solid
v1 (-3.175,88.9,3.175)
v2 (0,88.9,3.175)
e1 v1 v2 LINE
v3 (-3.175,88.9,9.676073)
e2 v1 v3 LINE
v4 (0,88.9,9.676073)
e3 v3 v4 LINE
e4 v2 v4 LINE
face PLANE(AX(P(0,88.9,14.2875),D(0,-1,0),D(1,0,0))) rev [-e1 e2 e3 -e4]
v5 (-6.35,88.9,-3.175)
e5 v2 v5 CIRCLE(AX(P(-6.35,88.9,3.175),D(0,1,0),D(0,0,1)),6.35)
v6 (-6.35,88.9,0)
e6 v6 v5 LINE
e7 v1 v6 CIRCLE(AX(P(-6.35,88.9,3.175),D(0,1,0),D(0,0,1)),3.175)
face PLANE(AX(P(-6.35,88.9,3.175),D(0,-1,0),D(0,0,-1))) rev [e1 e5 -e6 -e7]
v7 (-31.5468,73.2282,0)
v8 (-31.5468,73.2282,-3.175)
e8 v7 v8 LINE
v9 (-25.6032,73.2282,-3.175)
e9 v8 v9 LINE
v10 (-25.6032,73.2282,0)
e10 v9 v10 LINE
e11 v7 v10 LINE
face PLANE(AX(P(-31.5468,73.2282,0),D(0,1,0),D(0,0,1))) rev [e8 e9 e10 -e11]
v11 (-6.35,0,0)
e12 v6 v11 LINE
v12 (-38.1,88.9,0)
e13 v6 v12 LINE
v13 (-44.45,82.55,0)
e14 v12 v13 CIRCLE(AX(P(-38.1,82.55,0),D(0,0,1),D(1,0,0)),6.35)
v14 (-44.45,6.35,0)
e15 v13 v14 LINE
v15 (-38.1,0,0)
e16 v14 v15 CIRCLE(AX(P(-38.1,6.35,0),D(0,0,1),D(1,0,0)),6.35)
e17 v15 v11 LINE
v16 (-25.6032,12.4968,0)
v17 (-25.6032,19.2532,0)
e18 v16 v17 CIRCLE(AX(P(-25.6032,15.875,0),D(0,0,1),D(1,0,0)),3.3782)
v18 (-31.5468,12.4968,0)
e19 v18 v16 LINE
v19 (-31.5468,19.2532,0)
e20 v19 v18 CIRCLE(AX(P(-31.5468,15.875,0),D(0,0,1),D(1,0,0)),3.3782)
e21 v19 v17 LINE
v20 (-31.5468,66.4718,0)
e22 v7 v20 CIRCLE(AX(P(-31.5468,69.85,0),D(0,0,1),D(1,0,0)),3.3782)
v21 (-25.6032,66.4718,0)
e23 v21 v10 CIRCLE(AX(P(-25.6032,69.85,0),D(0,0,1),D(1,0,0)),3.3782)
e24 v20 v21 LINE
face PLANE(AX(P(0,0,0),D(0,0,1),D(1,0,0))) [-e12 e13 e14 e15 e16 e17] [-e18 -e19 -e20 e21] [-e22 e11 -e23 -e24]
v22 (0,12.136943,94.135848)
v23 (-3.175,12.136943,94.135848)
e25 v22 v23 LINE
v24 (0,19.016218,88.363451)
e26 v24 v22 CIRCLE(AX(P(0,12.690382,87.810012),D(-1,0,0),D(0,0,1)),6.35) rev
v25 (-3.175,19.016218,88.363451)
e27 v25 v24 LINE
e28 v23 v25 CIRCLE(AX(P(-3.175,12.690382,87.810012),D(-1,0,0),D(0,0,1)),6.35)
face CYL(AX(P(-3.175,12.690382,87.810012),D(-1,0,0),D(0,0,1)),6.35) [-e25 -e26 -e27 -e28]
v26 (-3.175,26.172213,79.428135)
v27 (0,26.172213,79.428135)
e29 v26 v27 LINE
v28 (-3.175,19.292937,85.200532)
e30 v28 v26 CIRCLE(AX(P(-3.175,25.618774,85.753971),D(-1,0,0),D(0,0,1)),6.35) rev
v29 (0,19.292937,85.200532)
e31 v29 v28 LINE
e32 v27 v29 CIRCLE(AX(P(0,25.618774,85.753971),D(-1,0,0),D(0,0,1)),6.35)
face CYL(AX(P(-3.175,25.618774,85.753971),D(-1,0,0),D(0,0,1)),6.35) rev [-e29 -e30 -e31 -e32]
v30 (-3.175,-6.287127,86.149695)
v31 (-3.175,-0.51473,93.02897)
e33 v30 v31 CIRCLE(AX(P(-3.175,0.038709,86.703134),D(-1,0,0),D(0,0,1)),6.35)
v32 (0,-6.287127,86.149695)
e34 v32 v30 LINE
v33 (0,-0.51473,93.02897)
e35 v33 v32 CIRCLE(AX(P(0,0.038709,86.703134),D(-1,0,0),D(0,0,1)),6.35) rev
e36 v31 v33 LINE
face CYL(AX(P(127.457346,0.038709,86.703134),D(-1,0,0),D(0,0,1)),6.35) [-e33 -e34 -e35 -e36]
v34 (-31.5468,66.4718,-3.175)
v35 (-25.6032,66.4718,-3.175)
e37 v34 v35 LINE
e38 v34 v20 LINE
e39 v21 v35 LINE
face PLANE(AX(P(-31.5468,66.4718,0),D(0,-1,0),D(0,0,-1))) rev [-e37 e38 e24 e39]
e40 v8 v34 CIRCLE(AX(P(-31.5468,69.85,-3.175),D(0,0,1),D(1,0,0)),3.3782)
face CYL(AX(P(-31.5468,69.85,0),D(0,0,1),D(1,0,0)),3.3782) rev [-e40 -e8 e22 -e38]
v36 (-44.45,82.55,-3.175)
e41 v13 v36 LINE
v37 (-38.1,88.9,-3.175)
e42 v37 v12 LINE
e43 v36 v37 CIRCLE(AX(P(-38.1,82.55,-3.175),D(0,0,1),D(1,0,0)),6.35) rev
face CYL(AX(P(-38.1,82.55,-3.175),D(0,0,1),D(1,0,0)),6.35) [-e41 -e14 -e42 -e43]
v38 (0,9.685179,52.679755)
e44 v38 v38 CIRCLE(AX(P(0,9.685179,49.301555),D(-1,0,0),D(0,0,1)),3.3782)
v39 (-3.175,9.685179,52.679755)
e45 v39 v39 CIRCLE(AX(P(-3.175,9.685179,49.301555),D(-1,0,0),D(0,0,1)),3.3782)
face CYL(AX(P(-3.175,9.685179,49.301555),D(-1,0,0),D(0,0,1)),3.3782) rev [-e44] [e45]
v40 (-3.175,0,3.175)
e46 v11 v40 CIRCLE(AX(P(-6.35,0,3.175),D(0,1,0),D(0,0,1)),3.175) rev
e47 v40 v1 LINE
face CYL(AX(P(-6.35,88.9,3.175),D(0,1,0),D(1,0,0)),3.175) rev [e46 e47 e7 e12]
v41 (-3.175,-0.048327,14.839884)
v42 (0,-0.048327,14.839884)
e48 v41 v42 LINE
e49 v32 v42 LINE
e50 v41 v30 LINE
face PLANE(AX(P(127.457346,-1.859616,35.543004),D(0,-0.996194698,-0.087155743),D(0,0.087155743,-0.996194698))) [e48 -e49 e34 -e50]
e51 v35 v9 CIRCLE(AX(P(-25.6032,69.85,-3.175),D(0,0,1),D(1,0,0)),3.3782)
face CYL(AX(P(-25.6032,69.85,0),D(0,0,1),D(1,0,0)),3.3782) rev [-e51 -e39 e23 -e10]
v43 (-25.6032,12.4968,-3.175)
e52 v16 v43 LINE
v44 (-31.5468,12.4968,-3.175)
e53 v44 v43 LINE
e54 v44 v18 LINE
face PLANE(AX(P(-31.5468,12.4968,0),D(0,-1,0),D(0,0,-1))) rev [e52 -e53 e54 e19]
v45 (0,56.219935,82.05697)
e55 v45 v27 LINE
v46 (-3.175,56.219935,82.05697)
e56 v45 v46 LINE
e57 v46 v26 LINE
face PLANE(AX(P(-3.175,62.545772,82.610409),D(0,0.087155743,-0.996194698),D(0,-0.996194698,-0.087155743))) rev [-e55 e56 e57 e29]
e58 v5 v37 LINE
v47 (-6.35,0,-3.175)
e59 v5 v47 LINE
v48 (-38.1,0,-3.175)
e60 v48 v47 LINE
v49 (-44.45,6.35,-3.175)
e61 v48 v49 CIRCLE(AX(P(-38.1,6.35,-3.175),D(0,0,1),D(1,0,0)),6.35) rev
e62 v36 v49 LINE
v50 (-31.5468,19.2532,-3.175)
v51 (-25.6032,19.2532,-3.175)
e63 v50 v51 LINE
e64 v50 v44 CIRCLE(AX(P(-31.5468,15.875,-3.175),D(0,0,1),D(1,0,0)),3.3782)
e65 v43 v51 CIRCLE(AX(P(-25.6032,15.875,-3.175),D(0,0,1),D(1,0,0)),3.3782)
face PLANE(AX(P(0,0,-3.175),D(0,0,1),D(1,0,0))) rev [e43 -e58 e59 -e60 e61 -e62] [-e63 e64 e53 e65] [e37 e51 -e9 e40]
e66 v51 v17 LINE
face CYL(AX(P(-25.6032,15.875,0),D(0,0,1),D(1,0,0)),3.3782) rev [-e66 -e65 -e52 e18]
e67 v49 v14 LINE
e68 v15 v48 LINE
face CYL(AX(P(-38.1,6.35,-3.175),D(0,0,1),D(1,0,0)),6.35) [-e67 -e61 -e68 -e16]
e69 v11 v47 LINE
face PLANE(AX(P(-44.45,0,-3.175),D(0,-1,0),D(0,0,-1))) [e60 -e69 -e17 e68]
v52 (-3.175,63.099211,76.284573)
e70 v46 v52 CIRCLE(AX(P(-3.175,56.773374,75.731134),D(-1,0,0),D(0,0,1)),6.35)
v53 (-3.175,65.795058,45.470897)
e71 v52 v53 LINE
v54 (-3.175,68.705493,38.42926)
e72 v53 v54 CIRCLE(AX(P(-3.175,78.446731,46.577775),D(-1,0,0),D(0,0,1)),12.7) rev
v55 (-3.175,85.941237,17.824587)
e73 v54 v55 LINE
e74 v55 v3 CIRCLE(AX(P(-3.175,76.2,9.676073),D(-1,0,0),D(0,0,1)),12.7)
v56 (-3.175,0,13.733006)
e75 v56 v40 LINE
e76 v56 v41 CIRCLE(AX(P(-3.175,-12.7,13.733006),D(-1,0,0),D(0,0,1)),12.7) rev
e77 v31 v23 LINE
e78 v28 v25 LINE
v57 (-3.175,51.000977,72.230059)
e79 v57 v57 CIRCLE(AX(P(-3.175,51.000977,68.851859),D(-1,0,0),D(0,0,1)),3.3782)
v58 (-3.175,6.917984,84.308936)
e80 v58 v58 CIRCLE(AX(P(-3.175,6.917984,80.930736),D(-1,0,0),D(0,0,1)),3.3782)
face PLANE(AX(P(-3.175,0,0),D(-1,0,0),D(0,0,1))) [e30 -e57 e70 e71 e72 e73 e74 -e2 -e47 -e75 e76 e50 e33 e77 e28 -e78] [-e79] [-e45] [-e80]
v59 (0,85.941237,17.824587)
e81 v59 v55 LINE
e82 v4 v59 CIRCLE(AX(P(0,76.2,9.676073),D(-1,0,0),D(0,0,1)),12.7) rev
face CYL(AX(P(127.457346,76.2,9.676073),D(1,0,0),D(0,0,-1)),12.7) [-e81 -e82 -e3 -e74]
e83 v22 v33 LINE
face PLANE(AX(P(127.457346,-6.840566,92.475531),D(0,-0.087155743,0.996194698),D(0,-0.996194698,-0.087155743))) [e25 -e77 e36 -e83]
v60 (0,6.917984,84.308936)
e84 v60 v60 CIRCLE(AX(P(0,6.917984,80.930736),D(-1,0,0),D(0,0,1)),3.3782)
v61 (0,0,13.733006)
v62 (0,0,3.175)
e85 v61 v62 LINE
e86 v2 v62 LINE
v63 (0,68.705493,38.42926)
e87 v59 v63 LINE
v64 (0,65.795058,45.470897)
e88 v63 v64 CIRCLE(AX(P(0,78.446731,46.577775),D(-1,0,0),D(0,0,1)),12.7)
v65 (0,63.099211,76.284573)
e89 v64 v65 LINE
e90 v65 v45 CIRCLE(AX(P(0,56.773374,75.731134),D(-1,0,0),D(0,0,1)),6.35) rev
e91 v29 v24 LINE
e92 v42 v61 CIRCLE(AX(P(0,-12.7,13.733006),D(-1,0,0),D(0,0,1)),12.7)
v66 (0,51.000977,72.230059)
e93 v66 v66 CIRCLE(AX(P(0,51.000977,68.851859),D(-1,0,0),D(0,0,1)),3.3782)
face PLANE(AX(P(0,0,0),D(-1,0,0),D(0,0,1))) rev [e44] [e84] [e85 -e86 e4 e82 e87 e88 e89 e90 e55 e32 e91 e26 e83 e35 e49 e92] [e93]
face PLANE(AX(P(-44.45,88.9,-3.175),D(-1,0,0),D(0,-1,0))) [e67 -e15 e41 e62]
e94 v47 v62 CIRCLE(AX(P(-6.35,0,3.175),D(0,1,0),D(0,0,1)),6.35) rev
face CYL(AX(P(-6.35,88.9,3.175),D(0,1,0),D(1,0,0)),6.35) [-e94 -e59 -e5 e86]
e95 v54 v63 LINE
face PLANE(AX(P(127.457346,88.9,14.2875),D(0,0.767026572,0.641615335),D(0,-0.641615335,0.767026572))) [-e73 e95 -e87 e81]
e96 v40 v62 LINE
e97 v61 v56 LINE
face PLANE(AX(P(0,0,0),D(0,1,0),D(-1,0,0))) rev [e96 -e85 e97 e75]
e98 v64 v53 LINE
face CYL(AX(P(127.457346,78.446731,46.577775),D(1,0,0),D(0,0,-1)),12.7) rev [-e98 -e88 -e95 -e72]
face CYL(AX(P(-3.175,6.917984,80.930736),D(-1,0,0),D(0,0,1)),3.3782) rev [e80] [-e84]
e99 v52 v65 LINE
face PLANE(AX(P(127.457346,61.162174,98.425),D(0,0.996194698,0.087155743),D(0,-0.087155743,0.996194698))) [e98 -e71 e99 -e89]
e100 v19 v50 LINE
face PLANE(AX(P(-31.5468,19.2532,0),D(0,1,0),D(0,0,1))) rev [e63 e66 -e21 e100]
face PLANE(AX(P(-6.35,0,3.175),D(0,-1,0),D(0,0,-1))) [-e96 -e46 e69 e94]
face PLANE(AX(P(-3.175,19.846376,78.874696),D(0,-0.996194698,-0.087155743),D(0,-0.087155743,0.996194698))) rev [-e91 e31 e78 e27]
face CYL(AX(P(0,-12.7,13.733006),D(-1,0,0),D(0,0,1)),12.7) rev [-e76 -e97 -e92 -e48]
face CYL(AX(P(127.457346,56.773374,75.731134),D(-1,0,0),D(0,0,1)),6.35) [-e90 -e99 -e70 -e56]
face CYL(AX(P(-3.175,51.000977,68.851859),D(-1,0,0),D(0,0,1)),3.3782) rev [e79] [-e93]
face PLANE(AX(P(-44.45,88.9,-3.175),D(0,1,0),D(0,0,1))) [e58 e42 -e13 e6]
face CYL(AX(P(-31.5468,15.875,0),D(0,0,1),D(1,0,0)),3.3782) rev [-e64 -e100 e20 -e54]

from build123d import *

# Parameters (mm, degrees)
SKETCH1_W                    = 44.45
SKETCH1_H                    = 88.9
BASE_FLANGE1_DEPTH           = 3.175
EDGE_FLANGE1_STRIP_W         = 19.05
EDGE_FLANGE1_STRIP_H         = 3.175
EDGE_FLANGE1_STRIP_CUT_DEPTH = 88.9
EDGE_FLANGE1_DEPTH           = 88.9
BOSS_EXTRUDE1_DEPTH          = 3.175
F_1_4_START                  = -3.175
F_1_4_CLEARANCE_SLOT1_DEPTH  = 3.175
F_1_4_CLEARANCE_HOLE1_D      = 6.7564
CUT_EXTRUDE1_DEPTH           = 139.903982124
FILLET1_R                    = 12.7
FILLET2_R                    = 6.35


# Read off the part's stored shape, not the designer's step: 1/4 Clearance Slot1
# Sheet-metal steps are written as plain solids
with BuildPart() as part:
    # Sketch1 → Base-Flange1 (new body)
    with BuildSketch(Plane.XY):
        with Locations((-22.225, 44.45)):
            Rectangle(SKETCH1_W, SKETCH1_H)
    extrude(amount=-BASE_FLANGE1_DEPTH)

    # Edge-Flange1 strip (across the edge) → Edge-Flange1 strip cut (cut)
    with BuildSketch(Plane(origin=(0, 0, 0), x_dir=(-1, 0, 0), z_dir=(0, 1, 0))):
        with Locations((-3.175, -1.5875)):
            Rectangle(EDGE_FLANGE1_STRIP_W, EDGE_FLANGE1_STRIP_H)
    extrude(amount=EDGE_FLANGE1_STRIP_CUT_DEPTH, mode=Mode.SUBTRACT)

    # Edge-Flange1 section (across the edge) → Edge-Flange1 (add)
    with BuildSketch(Plane(origin=(0, 0, 0), x_dir=(-1, 0, 0), z_dir=(0, 1, 0))):
        with BuildLine():
            Line((0, 3.175), (0, 14.2875))
            Line((0, 14.2875), (3.175, 14.2875))
            Line((3.175, 14.2875), (3.175, 3.175))
            ThreePointArc((3.175, 3.175), (4.10493597, 0.92993597), (6.35, 0))
            Line((6.35, 0), (6.35, -3.175))
            ThreePointArc((6.35, -3.175), (1.859871939, -1.315128061), (0, 3.175))
        make_face()
    extrude(amount=EDGE_FLANGE1_DEPTH)

    # Sketch9 → Boss-Extrude1 (add)
    with BuildSketch(Plane.ZY.offset(3.175)):
        Polygon((35.543004115, -1.859615648), (92.475531111, -6.840566346), (98.425, 61.162174233), (41.492473004, 66.143124931), (14.2875, 88.9), (14.2875, 0), align=None)
    extrude(amount=-BOSS_EXTRUDE1_DEPTH)

    # 1/4 Clearance Slot1 outline → 1/4 Clearance Slot1 (cut)
    with BuildSketch(Plane.XY.offset(F_1_4_START)):
        with BuildLine():
            Line((-31.5468, 12.4968), (-25.6032, 12.4968))
            ThreePointArc((-25.6032, 12.4968), (-22.225, 15.875), (-25.6032, 19.2532))
            Line((-25.6032, 19.2532), (-31.5468, 19.2532))
            ThreePointArc((-31.5468, 19.2532), (-34.925, 15.875), (-31.5468, 12.4968))
        make_face()
        with BuildLine():
            Line((-31.5468, 66.4718), (-25.6032, 66.4718))
            ThreePointArc((-25.6032, 66.4718), (-22.225, 69.85), (-25.6032, 73.2282))
            Line((-25.6032, 73.2282), (-31.5468, 73.2282))
            ThreePointArc((-31.5468, 73.2282), (-34.925, 69.85), (-31.5468, 66.4718))
        make_face()
    extrude(amount=F_1_4_CLEARANCE_SLOT1_DEPTH, mode=Mode.SUBTRACT)

    # 1/4 Clearance Hole1 (through all)
    with Locations(Plane.ZY.offset(3.175)):
        with Locations((68.851858569, 51.000976916), (49.301554713, 9.685179085), (80.930736378, 6.917984253)):
            Hole(F_1_4_CLEARANCE_HOLE1_D / 2)

    # Sketch16 → Cut-Extrude1 (cut, through all)
    with BuildSketch(Plane.ZY.offset(3.175)):
        Polygon((82.610409168, 62.545771649), (78.874696144, 19.846376402), (94.689286976, 18.462778986), (98.425, 61.162174233), align=None)
    extrude(amount=-CUT_EXTRUDE1_DEPTH, mode=Mode.SUBTRACT)

    # Fillet1
    # the kernel refuses this fillet: 12.7 mm, written as the material it adds along each edge
    with BuildSketch(Plane(origin=(0, 0, 14.2875), x_dir=(0, 0, -1), z_dir=(-1, 0, 0))) as fillet1_piece_1:
        with BuildLine():
            CenterArc((FILLET1_R * 0.0436609429085, FILLET1_R), FILLET1_R, 265, 5)
            Line((-FILLET1_R * 0.0434947998391, FILLET1_R * 0.00380530190825), (0, 0))
            Line((0, 0), (FILLET1_R * 0.0436609429085, 0))
        make_face()
    extrude(amount=3.175)
    with BuildSketch(Plane(origin=(-3.175, 66.143124931, 41.492473004), x_dir=(-2.6754118461414173e-15, 0.6416153350460713, -0.7670265717911718), z_dir=(1, 0, 0))) as fillet1_piece_2:
        with BuildLine():
            CenterArc((FILLET1_R * 0.314458316587, FILLET1_R), FILLET1_R, 235.087623307, 34.912376693)
            Line((-FILLET1_R * 0.257864707828, FILLET1_R * 0.179971734802), (0, 0))
            Line((0, 0), (FILLET1_R * 0.314458316587, 0))
        make_face()
    extrude(amount=3.175)
    # the kernel refuses this fillet: 12.7 mm, written as the material it takes off along each edge
    with BuildSketch(Plane(origin=(11.528568508, 88.9, 14.2875), x_dir=(0, 0, -1), z_dir=(-1, 0, 0))) as fillet1_2_piece_1:
        with BuildLine():
            CenterArc((FILLET1_R * 0.363104519926, FILLET1_R), FILLET1_R, 230.087623307, 39.912376693)
            Line((-FILLET1_R * 0.27851081512, FILLET1_R * 0.232973428209), (0, 0))
            Line((0, 0), (FILLET1_R * 0.363104519926, 0))
        make_face()
    extrude(amount=26.232137015, mode=Mode.SUBTRACT)

    # Fillet2
    fillet2_edges = [part.edges().sort_by_distance(p)[0] for p in [
        (-1.5875, 18.462778986, 94.689286976),
        (-1.5875, 62.545771649, 82.610409168),
        (-1.5875, 19.846376402, 78.874696144),
        (-1.5875, -6.840566346, 92.475531111),
        (-44.45, 88.9, -1.5875),
        (-44.45, 0, -1.5875),
    ]]
    fillet(fillet2_edges, radius=FILLET2_R)


solid = part.part
